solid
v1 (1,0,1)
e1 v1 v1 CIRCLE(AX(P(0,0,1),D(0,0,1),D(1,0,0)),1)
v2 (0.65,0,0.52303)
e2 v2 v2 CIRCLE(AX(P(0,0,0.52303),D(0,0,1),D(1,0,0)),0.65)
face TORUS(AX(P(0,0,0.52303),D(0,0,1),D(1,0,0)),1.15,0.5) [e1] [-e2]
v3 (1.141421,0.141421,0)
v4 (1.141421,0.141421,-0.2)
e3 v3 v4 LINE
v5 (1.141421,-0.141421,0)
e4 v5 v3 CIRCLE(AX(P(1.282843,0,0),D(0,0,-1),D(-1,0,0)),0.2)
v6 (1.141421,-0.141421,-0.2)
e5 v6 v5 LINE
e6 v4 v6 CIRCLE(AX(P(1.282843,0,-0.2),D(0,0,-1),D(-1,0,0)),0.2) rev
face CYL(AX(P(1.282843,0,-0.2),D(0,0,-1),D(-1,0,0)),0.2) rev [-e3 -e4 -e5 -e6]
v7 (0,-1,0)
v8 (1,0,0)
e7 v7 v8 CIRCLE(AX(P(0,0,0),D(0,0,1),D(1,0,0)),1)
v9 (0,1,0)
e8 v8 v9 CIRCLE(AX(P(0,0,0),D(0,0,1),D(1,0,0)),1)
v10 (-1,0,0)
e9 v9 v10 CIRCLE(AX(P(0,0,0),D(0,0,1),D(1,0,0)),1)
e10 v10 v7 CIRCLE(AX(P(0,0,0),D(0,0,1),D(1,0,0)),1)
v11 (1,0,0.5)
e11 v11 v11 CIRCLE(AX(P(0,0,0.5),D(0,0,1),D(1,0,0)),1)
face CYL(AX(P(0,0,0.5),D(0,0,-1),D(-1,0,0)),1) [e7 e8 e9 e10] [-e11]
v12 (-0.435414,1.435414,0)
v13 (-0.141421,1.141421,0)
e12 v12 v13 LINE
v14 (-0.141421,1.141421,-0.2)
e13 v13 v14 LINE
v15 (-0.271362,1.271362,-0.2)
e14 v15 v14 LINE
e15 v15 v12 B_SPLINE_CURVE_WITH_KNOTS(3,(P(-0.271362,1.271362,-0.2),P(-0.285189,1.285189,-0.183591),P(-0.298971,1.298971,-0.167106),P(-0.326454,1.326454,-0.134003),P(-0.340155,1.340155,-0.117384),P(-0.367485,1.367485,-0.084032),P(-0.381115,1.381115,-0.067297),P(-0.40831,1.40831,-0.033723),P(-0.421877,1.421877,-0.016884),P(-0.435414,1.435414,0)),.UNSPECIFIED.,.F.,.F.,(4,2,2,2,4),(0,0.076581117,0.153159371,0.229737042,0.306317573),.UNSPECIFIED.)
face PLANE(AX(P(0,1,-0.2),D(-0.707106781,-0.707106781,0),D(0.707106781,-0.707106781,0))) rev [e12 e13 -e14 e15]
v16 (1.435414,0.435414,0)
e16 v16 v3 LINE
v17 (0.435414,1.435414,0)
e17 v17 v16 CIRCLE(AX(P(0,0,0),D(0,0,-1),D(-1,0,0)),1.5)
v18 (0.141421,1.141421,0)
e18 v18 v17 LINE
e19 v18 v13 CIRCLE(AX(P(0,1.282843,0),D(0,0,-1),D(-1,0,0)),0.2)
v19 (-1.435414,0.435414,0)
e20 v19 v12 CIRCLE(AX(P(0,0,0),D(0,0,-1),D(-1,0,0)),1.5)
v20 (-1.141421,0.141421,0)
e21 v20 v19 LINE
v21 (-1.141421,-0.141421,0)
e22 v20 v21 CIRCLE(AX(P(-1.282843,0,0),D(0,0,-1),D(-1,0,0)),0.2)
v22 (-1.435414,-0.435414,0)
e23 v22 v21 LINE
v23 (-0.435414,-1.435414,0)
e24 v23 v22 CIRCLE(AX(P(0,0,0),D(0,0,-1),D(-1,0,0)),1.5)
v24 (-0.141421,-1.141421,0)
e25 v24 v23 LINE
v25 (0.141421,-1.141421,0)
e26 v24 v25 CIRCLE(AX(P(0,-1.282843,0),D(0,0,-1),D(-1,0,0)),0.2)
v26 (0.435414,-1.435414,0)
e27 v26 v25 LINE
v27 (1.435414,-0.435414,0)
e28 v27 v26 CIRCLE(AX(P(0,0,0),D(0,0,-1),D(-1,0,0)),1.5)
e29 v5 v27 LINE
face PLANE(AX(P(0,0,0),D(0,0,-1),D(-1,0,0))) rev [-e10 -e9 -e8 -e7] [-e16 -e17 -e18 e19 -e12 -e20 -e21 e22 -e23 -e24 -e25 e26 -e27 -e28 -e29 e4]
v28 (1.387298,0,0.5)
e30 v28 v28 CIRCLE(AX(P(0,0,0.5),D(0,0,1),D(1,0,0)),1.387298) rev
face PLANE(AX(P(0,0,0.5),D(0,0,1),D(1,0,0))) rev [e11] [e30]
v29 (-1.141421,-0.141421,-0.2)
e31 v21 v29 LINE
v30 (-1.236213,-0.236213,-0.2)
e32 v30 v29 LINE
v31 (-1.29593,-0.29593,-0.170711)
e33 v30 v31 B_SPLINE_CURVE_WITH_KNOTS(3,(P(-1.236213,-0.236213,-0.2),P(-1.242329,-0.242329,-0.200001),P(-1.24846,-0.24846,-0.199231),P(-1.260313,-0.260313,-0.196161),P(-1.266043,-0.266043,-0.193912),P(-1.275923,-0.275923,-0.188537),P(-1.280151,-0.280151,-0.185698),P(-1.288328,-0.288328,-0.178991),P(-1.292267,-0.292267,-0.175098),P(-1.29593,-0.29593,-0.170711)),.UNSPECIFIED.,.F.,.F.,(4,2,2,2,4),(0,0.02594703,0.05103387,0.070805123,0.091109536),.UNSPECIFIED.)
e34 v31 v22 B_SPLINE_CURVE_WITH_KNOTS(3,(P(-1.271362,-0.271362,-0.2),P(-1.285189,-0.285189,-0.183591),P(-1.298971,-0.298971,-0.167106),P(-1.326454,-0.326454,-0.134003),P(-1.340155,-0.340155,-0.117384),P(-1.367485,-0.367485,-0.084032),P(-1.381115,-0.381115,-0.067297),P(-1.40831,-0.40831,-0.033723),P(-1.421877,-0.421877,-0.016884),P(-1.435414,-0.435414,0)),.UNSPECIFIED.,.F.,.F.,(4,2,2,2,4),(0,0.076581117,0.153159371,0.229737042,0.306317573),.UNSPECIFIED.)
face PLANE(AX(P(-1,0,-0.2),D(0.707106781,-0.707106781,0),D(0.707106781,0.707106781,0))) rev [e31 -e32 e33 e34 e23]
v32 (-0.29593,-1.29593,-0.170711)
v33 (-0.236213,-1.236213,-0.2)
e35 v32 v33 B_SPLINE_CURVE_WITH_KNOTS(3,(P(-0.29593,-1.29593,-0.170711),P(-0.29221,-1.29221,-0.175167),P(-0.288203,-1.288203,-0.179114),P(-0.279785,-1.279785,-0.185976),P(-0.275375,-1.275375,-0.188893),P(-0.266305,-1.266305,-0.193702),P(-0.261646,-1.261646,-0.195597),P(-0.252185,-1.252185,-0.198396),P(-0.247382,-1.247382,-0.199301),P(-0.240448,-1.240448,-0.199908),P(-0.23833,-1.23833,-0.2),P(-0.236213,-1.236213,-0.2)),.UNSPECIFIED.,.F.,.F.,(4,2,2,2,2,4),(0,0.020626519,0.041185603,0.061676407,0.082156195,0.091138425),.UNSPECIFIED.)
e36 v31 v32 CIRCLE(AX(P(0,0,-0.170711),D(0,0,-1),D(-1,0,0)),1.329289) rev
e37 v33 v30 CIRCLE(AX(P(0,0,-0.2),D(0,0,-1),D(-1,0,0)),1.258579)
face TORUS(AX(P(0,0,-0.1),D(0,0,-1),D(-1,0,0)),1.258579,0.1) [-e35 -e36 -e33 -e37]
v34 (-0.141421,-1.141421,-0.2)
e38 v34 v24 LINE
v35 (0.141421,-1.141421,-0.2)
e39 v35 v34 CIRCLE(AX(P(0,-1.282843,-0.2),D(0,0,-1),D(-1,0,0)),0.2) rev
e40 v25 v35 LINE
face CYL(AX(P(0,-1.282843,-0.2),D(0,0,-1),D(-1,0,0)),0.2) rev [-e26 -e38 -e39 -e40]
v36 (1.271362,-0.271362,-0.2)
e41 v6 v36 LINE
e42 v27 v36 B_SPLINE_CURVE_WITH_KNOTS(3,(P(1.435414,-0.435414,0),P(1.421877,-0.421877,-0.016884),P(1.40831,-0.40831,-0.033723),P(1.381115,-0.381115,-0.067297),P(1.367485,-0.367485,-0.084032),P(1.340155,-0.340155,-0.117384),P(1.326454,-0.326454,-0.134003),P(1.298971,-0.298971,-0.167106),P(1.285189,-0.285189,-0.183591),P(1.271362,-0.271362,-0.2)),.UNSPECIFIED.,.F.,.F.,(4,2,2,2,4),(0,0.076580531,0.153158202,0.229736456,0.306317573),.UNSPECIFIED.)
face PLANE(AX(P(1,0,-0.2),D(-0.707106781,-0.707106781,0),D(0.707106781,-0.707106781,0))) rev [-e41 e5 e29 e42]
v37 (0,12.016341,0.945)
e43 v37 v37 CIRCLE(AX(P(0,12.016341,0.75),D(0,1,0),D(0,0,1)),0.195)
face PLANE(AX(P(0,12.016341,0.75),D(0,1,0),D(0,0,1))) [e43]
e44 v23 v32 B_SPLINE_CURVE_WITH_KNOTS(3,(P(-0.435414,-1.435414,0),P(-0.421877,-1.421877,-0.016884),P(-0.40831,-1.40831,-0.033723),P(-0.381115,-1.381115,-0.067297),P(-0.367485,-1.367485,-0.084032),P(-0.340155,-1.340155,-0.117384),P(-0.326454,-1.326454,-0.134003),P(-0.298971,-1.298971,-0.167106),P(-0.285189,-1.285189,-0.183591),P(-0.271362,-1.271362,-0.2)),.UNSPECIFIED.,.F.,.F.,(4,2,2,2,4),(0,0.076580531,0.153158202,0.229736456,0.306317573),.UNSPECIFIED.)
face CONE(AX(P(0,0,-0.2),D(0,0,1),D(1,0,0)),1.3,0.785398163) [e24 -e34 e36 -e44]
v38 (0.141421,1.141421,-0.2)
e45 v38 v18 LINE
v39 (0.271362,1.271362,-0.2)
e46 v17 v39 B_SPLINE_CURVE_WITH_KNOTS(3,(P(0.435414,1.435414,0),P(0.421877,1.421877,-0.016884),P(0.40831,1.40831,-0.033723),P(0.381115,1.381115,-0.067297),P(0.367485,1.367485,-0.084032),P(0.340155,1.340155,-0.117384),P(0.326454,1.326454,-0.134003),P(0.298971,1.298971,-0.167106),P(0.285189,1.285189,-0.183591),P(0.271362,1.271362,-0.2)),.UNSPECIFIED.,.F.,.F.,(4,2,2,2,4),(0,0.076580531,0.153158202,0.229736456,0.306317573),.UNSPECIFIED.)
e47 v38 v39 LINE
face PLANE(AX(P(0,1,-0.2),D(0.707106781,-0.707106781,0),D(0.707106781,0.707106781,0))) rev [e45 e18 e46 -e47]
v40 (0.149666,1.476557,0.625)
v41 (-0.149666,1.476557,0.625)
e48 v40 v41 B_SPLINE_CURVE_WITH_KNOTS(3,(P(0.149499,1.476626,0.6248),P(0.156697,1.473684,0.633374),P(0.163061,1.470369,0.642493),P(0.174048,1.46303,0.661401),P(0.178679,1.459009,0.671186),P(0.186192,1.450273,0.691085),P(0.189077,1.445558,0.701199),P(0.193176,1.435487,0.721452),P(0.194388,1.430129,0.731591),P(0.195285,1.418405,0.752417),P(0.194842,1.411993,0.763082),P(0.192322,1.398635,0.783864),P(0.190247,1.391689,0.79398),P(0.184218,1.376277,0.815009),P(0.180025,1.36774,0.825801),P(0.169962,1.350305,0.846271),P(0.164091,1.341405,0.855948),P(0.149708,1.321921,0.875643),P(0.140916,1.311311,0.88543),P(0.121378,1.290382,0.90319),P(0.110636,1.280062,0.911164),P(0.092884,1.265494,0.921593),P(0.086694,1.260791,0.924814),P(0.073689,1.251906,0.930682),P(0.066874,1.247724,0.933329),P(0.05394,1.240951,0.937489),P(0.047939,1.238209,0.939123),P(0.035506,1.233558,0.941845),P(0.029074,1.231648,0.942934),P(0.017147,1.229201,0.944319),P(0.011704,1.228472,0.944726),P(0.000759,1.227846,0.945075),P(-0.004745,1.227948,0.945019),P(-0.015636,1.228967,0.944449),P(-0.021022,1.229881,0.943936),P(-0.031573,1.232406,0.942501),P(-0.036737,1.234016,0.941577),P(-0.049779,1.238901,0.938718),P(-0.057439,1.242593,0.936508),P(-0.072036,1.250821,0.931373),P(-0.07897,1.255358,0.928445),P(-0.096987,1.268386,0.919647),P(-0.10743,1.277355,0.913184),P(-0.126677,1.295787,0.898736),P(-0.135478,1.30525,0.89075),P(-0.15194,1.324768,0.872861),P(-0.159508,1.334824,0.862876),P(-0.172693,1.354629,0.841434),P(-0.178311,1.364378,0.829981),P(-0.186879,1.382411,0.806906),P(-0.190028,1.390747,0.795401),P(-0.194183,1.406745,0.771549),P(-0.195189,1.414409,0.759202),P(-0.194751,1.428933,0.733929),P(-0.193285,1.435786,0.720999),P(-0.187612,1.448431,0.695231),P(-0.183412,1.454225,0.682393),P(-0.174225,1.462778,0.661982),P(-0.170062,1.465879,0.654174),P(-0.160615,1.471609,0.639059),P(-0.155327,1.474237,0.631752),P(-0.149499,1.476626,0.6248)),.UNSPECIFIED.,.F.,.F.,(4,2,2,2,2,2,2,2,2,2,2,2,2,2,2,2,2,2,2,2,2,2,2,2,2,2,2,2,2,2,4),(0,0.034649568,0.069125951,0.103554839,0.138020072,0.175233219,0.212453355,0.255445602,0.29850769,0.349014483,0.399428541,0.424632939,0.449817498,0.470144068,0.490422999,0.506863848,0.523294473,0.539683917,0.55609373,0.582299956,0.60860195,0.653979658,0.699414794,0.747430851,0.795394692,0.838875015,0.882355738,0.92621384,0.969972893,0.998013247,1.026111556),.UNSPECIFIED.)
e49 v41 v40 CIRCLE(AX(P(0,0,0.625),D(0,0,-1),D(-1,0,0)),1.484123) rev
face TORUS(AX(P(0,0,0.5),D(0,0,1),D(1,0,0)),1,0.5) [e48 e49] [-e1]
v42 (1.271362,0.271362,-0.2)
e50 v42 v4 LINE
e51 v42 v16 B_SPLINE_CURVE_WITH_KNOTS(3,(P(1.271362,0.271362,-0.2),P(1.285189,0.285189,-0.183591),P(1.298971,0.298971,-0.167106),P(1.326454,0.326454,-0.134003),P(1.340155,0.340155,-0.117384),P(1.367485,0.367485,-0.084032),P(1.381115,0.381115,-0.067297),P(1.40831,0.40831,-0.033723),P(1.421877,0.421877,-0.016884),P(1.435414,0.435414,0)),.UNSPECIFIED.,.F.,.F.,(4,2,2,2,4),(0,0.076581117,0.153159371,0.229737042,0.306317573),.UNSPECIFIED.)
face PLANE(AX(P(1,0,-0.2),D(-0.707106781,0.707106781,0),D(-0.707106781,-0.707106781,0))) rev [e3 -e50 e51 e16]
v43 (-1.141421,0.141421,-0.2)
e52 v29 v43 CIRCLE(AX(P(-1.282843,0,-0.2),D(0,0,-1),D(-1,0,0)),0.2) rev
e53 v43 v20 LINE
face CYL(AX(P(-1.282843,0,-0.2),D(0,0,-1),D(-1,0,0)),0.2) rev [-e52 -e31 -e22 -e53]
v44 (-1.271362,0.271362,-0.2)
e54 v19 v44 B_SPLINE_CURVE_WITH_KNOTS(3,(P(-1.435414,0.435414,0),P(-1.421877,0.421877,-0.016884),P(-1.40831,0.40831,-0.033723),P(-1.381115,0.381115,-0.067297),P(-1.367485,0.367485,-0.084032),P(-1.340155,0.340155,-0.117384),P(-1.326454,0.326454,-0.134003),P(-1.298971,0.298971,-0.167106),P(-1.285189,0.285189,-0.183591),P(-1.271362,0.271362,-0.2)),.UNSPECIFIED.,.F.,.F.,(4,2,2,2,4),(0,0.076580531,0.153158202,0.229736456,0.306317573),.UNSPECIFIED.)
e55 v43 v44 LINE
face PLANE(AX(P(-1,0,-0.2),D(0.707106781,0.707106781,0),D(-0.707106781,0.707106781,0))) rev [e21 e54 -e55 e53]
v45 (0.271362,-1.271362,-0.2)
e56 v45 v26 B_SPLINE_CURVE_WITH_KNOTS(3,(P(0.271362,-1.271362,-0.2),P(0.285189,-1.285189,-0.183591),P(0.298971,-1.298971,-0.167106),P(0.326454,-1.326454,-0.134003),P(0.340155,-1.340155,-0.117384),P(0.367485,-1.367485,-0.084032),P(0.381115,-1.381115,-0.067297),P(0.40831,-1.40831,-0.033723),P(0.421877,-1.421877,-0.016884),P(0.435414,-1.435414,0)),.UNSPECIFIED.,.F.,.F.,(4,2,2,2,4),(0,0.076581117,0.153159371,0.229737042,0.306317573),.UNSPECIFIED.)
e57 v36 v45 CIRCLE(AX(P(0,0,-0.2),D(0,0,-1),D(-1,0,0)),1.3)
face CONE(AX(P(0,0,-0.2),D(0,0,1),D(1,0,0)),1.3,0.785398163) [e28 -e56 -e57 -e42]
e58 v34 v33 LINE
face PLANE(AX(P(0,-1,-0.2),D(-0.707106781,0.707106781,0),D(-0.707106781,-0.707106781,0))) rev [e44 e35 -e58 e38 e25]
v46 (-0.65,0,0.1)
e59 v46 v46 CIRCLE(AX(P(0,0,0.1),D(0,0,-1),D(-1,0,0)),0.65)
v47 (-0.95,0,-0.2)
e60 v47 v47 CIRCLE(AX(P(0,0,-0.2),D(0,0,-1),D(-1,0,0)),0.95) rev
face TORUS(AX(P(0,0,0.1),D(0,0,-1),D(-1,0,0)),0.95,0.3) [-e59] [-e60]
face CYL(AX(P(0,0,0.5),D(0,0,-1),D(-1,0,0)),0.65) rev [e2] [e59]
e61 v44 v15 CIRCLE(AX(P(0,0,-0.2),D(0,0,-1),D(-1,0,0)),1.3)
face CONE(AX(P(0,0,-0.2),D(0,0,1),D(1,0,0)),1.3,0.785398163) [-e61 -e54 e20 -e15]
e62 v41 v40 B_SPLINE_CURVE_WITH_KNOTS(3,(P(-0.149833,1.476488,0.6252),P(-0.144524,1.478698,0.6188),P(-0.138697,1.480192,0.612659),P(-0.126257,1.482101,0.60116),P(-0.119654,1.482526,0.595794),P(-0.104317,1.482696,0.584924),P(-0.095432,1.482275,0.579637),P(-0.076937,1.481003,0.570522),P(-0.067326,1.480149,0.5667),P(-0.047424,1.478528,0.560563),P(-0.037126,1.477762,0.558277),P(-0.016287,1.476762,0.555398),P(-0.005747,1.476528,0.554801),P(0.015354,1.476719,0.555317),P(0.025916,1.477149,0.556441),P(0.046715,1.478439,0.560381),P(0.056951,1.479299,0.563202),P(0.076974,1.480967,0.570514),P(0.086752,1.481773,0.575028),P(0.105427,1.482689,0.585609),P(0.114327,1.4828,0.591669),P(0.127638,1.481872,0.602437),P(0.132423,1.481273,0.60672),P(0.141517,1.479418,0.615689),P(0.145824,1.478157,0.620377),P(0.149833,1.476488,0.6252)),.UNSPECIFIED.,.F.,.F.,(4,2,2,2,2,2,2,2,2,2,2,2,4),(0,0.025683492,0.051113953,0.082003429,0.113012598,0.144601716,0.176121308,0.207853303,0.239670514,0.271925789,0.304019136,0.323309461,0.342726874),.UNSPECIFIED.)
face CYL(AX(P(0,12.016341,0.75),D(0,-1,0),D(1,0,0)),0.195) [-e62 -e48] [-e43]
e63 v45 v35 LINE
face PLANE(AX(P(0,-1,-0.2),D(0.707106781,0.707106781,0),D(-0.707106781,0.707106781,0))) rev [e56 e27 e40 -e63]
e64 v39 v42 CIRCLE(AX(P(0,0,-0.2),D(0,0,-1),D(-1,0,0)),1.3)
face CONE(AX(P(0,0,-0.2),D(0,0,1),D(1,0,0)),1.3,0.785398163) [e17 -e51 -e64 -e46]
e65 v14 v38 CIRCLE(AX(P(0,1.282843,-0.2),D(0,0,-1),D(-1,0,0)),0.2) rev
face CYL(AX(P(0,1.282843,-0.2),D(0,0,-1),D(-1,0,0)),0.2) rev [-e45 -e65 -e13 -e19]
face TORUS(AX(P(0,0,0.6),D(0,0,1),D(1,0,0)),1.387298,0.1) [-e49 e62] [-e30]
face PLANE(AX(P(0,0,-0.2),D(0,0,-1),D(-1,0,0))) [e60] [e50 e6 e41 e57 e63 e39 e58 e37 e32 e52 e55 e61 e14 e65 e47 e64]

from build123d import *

# Parameters (mm, degrees)
SKETCH1_R           = 1
SKETCH1_R_2         = 0.65
BOSS_EXTRUDE1_DEPTH = 0.5
SKETCH3_R           = 1.5
SKETCH3_R_2         = 0.65
BOSS_EXTRUDE4_DEPTH = 0.5
BOSS_EXTRUDE5_START = 0.2
SKETCH4_R           = 0.65
BOSS_EXTRUDE5_DEPTH = 0.2
FILLET4_R           = 0.5
FILLET5_R           = 0.5
FILLET6_R           = 0.1
CHAMFER2_SIZE       = 0.2
FILLET8_R           = 0.2
FILLET9_R           = 0.1
FILLET10_R          = 0.3
SKETCH6_R           = 0.195


# Some blends are built 0.0001 mm under size
with BuildPart() as part:
    # Sketch1 → Boss-Extrude1 (new body)
    with BuildSketch(Plane.XY):
        Circle(SKETCH1_R)
        Circle(SKETCH1_R_2, mode=Mode.SUBTRACT)
    extrude(amount=BOSS_EXTRUDE1_DEPTH)

    # Sketch3 → Boss-Extrude4 (add)
    with BuildSketch(Plane.XY.offset(0.5)):
        Circle(SKETCH3_R)
        Circle(SKETCH3_R_2, mode=Mode.SUBTRACT)
    extrude(amount=BOSS_EXTRUDE4_DEPTH)

    # Sketch4 → Boss-Extrude5 (add)
    with BuildSketch(Plane(origin=(0, 0, 0), x_dir=(-1, 0, 0), z_dir=(0, 0, -1)).offset(BOSS_EXTRUDE5_START)):
        with BuildLine():
            Line((0, 1), (-0.435414347, 1.435414347))
            ThreePointArc((-0.435414347, 1.435414347), (-1.060660172, 1.060660172), (-1.435414347, 0.435414347))
            Line((-1.435414347, 0.435414347), (-1, 0))
            Line((-1, 0), (-1.435414347, -0.435414347))
            ThreePointArc((-1.435414347, -0.435414347), (-1.060660172, -1.060660172), (-0.435414347, -1.435414347))
            Line((-0.435414347, -1.435414347), (0, -1))
            Line((0, -1), (0.435414347, -1.435414347))
            ThreePointArc((0.435414347, -1.435414347), (1.060660172, -1.060660172), (1.435414347, -0.435414347))
            Line((1.435414347, -0.435414347), (1, 0))
            Line((1, 0), (1.435414347, 0.435414347))
            ThreePointArc((1.435414347, 0.435414347), (1.060660172, 1.060660172), (0.435414347, 1.435414347))
            Line((0.435414347, 1.435414347), (0, 1))
        make_face()
        Circle(SKETCH4_R, mode=Mode.SUBTRACT)
    extrude(amount=-BOSS_EXTRUDE5_DEPTH)

    # Fillet4
    fillet4_edges = [part.edges().sort_by_distance(p)[0] for p in [
        (-1.5, 0, 1),
    ]]
    fillet(fillet4_edges, radius=FILLET4_R - 0.0001)  # a hair under: the kernel refuses the full size

    # Fillet5
    # the kernel refuses this fillet: 0.5 mm, written as the material it takes off along each edge
    with BuildSketch(Plane(origin=(0, 0, 1), x_dir=(1, 0, 0), z_dir=(0, -1, 0))) as fillet5_piece_1:
        with BuildLine():
            CenterArc((1.15, -0.477001038), FILLET5_R, 107.44559106, 72.55440894)
            Line((0.65, -0.477001038), (0.64, -0.477001038))
            Line((0.64, -0.477001038), (0.64, 0))
            Line((0.64, 0), (0.65, 0.01))
            ThreePointArc((0.65, 0.01), (0.82505, 0.01), (0.997102, 0.009540021))
            Line((0.997102, 0.009540021), (1.0001, 0))
        make_face()
    revolve(axis=Axis((0, 0, 1), (0, 0, 1)), mode=Mode.SUBTRACT)

    # Fillet6
    fillet6_edges = [part.edges().sort_by_distance(p)[0] for p in [
        (-1.5, 0, 0.5),
    ]]
    fillet(fillet6_edges, radius=FILLET6_R)

    # Chamfer2
    chamfer2_edges = [part.edges().sort_by_distance(p)[0] for p in [
        (-1.060660172, -1.060660172, -0.2),
        (-1.060660172, 1.060660172, -0.2),
        (1.060660172, 1.060660172, -0.2),
        (1.060660172, -1.060660172, -0.2),
    ]]
    chamfer(chamfer2_edges, length=CHAMFER2_SIZE - 0.0001)  # a hair under: the kernel refuses the full size

    # Fillet8
    # the kernel refuses this fillet: 0.2 mm, written as the material it adds along each edge
    with BuildSketch(Plane(origin=(0, 1, -0.2), x_dir=(-0.7071067811865487, 0.7071067811865465, 0), z_dir=(0, 0, 1)), Plane(origin=(-1, 0, -0.2), x_dir=(-0.7071067811865464, -0.7071067811865487, 0), z_dir=(0, 0, 1))) as fillet8_piece_1:
        with BuildLine():
            CenterArc((FILLET8_R, -FILLET8_R), FILLET8_R, 90, 90)
            Line((0, -FILLET8_R), (0, 0))
            Line((0, 0), (FILLET8_R, 0))
        make_face()
    extrude(amount=0.2)
    with BuildSketch(Plane(origin=(1, 0, -0.2), x_dir=(0.707106781186541, -0.707106781186554, 0), z_dir=(0, 0, 1)), Plane(origin=(0, -1, -0.2), x_dir=(-0.707106781186554, -0.707106781186541, 0), z_dir=(0, 0, 1))) as fillet8_piece_2:
        with BuildLine():
            CenterArc((FILLET8_R, FILLET8_R), FILLET8_R, 180, 90)
            Line((0, FILLET8_R), (0, 0))
            Line((0, 0), (FILLET8_R, 0))
        make_face()
    extrude(amount=0.2)

    # Fillet9
    fillet9_edges = [part.edges().sort_by_distance(p)[0] for p in [
        (-0.919309526, -0.919309526, -0.2),
    ]]
    fillet(fillet9_edges, radius=FILLET9_R)

    # Fillet10
    # the kernel refuses this fillet: 0.3 mm, written as the material it takes off along each edge
    with BuildSketch(Plane(origin=(0, 0, -0.2), x_dir=(-1, 0, 0), z_dir=(0, -1, 0))) as fillet10_piece_1:
        with BuildLine():
            CenterArc((0.65 + FILLET10_R, -FILLET10_R), FILLET10_R, 90, 90)
            Line((0.65, -FILLET10_R), (0.65, 0))
            Line((0.65, 0), (0.65 + FILLET10_R, 0))
        make_face()
    revolve(axis=Axis((0, 0, -0.2), (0, 0, -1)), mode=Mode.SUBTRACT)

    # Sweep2: sweep along a path in Sketch5
    with BuildLine(Plane.XY.offset(0.75)) as sweep2_path:
        Line((0, 1), (0, 12.016341366))
    # Sketch6 → Sweep2 (sweep)
    with BuildSketch(Plane(origin=(0, 1, 0), x_dir=(1, 0, 0), z_dir=(0, 1, 0))):
        with Locations((0, -0.75)):
            Circle(SKETCH6_R)
    sweep(path=sweep2_path.line)


solid = part.part
